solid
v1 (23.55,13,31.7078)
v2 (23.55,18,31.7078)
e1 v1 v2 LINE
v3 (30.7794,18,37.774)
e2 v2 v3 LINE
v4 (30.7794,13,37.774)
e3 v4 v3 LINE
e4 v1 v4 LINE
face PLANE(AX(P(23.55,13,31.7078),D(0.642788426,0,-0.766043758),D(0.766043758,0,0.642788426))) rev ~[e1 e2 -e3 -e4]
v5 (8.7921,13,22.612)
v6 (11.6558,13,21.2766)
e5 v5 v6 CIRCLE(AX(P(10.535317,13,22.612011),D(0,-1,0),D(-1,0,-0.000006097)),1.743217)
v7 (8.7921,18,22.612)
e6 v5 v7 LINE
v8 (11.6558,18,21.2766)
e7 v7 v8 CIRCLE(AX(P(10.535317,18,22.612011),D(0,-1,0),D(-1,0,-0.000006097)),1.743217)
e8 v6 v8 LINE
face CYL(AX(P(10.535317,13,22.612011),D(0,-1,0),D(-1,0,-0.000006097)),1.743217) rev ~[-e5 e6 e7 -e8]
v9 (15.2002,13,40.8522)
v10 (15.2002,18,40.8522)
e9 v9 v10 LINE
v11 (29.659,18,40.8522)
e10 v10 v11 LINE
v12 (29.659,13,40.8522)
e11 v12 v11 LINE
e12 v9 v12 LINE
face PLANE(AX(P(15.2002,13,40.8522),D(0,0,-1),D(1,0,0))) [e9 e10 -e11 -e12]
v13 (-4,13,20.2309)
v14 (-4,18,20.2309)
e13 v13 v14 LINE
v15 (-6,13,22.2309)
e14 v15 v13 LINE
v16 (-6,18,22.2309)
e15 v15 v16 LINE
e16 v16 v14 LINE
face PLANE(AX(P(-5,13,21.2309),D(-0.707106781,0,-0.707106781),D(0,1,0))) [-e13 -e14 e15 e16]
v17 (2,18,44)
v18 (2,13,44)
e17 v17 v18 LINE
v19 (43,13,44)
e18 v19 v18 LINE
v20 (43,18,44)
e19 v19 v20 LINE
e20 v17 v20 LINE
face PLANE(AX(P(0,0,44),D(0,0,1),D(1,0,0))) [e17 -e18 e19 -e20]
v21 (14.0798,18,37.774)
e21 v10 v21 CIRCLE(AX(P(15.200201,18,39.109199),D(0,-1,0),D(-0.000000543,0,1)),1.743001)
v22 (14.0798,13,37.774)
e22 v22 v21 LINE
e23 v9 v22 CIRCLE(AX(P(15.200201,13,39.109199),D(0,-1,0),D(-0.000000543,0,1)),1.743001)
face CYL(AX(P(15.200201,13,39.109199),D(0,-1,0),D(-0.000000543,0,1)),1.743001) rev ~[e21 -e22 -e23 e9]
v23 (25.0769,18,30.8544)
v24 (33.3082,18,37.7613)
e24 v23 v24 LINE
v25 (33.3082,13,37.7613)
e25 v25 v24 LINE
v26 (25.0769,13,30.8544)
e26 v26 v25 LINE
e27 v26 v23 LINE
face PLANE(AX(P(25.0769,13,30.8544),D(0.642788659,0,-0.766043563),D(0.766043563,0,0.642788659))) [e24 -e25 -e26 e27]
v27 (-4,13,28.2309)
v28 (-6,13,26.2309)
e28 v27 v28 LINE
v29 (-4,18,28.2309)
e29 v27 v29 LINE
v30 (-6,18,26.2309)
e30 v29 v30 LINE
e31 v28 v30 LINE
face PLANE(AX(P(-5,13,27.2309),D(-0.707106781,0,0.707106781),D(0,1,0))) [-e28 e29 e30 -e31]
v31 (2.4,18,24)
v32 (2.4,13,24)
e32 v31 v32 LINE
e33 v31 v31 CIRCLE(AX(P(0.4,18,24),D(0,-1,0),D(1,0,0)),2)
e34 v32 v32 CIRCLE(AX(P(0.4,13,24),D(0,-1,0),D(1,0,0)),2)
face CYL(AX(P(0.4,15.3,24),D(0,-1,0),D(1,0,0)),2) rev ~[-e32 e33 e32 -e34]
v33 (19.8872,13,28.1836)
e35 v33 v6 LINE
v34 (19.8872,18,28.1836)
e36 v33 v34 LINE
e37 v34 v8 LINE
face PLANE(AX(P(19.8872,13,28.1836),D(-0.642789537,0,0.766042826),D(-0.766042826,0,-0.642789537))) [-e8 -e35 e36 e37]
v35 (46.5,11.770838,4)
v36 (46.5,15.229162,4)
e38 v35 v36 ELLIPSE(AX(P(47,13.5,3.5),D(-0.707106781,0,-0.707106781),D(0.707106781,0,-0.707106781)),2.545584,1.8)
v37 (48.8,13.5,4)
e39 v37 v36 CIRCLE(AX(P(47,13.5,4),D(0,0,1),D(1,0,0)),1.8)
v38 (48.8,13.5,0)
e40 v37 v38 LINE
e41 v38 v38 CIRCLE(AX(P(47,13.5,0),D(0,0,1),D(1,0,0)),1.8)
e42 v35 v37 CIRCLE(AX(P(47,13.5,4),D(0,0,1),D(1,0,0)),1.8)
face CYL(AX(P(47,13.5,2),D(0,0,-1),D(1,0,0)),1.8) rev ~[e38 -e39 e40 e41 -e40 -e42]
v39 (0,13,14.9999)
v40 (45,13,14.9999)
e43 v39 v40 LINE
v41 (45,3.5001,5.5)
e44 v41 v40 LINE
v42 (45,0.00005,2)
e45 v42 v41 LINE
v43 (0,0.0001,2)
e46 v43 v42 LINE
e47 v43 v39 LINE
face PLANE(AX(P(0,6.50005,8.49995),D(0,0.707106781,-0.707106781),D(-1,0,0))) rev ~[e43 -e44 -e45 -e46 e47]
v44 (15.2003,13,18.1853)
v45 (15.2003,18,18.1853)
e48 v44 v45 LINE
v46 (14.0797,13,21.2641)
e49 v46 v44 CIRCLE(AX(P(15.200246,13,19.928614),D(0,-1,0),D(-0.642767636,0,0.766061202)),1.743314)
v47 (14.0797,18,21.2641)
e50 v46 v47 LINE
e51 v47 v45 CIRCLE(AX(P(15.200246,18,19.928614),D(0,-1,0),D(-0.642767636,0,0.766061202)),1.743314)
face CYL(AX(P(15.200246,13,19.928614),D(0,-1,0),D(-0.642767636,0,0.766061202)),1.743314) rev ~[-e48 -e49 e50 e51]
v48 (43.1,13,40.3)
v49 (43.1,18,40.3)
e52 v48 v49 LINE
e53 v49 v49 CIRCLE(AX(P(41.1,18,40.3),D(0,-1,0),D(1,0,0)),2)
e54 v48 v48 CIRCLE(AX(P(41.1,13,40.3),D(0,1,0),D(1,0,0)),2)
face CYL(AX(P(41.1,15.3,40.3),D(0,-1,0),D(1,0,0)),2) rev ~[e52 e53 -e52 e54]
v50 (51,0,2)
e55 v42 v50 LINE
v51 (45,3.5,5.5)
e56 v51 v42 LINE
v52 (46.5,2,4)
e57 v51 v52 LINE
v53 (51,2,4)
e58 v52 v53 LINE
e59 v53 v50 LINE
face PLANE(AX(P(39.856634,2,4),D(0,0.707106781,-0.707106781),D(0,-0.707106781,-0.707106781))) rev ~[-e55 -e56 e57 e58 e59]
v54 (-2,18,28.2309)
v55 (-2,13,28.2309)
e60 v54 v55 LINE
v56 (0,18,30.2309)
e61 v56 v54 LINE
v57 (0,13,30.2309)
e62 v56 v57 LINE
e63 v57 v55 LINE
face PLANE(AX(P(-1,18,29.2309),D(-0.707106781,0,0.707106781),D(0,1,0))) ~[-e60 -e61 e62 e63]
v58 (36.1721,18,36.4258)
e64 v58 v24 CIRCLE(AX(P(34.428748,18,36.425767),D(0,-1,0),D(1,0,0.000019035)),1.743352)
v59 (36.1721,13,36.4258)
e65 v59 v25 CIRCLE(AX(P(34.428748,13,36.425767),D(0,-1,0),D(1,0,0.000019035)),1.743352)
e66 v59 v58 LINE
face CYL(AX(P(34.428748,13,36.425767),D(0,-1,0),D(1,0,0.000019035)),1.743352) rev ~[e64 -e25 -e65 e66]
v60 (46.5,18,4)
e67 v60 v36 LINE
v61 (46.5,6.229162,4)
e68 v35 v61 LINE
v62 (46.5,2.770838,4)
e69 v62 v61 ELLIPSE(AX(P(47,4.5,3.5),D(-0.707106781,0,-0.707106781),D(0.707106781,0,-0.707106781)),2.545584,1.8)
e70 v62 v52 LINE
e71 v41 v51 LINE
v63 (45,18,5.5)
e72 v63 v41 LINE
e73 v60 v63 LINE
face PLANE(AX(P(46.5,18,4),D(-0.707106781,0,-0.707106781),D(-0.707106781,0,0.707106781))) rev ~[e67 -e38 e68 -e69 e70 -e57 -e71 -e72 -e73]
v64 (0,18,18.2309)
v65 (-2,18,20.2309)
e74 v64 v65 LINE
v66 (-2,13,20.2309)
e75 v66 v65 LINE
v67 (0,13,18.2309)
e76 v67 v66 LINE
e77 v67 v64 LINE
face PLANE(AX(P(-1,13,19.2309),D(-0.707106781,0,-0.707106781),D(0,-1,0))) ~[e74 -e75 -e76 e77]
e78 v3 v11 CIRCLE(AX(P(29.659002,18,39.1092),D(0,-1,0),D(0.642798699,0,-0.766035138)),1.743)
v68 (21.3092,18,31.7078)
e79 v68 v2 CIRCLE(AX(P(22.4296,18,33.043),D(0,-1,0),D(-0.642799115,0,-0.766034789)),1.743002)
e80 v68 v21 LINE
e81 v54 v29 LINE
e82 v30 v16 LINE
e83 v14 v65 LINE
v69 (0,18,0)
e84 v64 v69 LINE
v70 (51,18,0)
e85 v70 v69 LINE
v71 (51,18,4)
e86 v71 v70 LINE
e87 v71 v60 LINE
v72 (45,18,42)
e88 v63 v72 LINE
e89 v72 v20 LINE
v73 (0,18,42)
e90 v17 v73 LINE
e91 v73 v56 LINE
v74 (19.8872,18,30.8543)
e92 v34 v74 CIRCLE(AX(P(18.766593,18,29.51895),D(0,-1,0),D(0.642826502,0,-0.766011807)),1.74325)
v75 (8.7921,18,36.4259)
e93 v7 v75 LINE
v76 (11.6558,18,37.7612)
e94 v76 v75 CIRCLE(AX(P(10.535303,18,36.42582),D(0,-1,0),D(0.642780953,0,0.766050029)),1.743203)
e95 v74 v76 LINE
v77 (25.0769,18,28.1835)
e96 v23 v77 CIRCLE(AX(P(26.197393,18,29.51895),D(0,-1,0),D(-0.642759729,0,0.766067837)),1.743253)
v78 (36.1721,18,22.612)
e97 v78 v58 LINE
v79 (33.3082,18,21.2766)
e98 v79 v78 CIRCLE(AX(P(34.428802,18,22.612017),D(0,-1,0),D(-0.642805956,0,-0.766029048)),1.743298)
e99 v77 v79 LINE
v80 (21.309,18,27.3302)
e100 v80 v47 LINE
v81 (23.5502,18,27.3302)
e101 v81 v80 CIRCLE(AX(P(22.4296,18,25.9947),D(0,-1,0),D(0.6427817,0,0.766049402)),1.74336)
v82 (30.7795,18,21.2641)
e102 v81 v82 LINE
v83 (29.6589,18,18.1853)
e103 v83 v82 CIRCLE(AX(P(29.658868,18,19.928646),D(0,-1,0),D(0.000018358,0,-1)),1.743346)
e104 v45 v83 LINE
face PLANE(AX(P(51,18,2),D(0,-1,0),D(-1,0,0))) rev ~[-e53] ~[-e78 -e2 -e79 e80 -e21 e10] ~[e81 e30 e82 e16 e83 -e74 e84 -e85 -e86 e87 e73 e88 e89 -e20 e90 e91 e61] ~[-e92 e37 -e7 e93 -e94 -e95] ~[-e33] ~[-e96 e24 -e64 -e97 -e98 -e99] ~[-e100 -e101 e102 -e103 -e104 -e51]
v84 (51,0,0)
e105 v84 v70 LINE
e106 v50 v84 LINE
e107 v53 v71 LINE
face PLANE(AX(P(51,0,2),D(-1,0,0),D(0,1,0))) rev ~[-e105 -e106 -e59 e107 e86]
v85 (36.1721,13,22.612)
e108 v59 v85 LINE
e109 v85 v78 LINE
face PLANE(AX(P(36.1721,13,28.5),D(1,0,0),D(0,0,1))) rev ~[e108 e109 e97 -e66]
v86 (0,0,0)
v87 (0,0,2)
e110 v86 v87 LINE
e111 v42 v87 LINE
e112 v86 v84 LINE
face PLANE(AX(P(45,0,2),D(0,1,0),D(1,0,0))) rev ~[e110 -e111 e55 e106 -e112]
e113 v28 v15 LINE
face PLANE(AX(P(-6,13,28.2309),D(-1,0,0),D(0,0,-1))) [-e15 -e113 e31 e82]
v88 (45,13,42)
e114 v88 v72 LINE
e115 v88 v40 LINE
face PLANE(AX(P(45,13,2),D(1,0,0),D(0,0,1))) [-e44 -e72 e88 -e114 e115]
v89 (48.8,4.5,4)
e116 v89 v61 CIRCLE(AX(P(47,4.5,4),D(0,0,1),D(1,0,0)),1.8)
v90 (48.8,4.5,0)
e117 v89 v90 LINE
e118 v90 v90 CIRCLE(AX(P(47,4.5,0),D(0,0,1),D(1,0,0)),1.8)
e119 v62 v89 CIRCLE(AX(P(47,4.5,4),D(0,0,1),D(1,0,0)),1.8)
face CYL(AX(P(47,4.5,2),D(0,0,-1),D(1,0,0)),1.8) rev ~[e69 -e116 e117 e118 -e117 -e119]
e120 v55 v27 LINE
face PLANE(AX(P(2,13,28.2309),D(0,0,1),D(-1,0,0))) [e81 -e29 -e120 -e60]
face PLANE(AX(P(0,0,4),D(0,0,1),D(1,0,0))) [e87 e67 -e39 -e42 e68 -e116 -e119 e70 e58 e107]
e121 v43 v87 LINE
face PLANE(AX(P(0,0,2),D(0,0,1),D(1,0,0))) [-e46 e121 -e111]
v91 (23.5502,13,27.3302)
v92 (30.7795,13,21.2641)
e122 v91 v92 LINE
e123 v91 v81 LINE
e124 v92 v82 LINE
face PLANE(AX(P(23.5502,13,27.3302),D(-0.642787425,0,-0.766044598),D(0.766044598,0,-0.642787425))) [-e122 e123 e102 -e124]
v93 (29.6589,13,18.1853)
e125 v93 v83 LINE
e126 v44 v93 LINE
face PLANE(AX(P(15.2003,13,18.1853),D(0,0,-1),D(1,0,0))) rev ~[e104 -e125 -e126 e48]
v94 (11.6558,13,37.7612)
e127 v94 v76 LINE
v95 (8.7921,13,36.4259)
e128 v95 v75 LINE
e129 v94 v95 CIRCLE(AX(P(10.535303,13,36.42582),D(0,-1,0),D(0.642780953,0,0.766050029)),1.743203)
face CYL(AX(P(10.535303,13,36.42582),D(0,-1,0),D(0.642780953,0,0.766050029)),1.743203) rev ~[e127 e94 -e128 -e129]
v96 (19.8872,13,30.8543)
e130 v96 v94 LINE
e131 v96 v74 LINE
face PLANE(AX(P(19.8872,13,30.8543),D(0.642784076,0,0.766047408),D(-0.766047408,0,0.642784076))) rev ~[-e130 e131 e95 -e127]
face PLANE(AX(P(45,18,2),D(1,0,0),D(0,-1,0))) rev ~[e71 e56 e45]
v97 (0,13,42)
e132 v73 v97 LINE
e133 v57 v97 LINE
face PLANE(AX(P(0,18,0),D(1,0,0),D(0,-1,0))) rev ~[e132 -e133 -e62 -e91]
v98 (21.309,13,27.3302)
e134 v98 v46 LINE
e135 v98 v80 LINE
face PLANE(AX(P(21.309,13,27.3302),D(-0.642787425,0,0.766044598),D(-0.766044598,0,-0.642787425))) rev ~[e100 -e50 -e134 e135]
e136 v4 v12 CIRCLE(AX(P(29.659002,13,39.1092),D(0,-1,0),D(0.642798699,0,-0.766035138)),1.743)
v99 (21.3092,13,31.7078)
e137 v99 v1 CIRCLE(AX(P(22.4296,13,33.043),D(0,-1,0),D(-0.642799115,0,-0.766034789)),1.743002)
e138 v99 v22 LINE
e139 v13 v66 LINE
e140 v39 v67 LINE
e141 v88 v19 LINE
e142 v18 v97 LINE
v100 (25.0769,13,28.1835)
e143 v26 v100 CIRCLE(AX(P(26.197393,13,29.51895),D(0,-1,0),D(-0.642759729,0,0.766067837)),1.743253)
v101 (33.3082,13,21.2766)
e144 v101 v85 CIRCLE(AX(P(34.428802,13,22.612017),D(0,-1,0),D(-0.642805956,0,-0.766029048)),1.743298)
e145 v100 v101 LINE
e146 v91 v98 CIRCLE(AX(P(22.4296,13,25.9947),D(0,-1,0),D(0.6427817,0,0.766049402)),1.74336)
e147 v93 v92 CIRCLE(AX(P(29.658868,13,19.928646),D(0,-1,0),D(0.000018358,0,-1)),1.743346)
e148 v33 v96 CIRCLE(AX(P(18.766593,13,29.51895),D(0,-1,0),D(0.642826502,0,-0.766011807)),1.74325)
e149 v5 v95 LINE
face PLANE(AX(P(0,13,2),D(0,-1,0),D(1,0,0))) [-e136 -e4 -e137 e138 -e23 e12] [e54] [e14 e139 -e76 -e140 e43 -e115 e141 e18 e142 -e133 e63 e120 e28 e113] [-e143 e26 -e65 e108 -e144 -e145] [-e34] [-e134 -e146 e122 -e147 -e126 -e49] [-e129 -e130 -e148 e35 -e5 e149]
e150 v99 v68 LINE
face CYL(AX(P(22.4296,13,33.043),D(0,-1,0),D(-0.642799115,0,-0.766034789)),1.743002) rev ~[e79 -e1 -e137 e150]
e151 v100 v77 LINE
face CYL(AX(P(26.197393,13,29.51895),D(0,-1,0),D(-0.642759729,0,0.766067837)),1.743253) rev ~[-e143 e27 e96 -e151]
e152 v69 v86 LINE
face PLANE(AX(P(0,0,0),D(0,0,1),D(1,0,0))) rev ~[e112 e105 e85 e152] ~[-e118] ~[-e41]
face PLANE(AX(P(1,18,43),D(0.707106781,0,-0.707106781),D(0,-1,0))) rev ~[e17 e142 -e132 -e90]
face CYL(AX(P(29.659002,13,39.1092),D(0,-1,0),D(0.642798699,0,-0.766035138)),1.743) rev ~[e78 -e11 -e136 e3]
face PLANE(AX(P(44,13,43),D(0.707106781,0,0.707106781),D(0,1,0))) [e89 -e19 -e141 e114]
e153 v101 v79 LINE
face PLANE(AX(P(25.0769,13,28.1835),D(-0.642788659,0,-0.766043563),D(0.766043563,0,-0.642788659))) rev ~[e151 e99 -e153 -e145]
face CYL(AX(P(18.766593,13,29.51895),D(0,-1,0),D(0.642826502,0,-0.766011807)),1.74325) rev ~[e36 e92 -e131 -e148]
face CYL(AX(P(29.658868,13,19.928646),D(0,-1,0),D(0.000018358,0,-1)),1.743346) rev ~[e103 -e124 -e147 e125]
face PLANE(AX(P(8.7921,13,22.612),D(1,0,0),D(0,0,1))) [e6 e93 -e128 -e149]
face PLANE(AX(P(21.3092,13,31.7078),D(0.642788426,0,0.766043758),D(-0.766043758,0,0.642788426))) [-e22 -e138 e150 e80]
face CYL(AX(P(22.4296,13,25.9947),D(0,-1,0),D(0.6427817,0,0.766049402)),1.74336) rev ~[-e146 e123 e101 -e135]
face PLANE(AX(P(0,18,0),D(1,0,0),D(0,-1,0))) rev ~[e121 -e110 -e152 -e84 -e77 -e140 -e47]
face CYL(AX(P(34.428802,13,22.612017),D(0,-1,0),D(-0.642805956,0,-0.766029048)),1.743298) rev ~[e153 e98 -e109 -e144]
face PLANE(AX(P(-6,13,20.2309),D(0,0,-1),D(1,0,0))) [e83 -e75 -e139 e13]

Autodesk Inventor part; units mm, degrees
sketch "スケッチ1" plane through (0, 0, 0) normal (0, 0, 1) x (1, 0, 0)
  line L0 (0, 0) -> (51, 0)
  line L1 (51, 0) -> (51, 18)
  line L2 (51, 18) -> (0, 18)
  line L3 (0, 18) -> (0, 0)
  circle A0 centre (47, 13.5) radius 1.8
  circle A1 centre (47, 4.5) radius 1.8
  dimension "d0" = 51
  dimension "d1" = 18
  dimension "d4" = 3.6
  dimension "d5" = 13.5
  dimension "d6" = 4
  dimension "d7" = 3.6
  dimension "d8" = 4
  dimension "d9" = 4.5
extrude "押し出し2" add sketch "スケッチ1" along normal blind 2
sketch "スケッチ2" plane through (0, 0, 2) normal (0, 0, 1) x (1, 0, 0)
  line L0 (0, 18) -> (0, 0) projected
  line L1 (0, 18) -> (44, 18)
  line L2 (44, 18) -> (44, 13)
  line L3 (44, 13) -> (0, 13)
  line L4 (0, 13) -> (0, 18)
  dimension "d12" = 44
  dimension "d13" = 5
extrude "押し出し3" add sketch "スケッチ2" along normal blind 42
sketch "スケッチ3" plane through (0, 13, 2) normal (0, -1, 0) x (1, 0, 0)
  circle A0 centre (41.1, 3.5) radius 2
  line L0 (44, 0) -> (44, 42) projected
  line L1 (44, 0) -> (0, 0) projected
  circle A1 centre (0.4, 19.8) radius 2
  point P0 (0, -2)
  dimension "d16" = 4
  dimension "d17" = 2.9
  dimension "d18" = 3.5
  dimension "d27" = 4
  dimension "d28" = 40.7
  dimension "d29" = 16.3
sketch "スケッチ4" plane through (0, 13, 2) normal (0, -1, 0) x (1, 0, 0)
  line L0 (8, 13.3) -> (-4, 13.3)
  line L1 (-4, 13.3) -> (-4, 24.3)
  line L2 (-4, 24.3) -> (8, 24.3)
  line L3 (8, 24.3) -> (8, 13.3)
  line L4 (44, 0) -> (0, 0) projected
  line L5 (44, 0) -> (44, 42) projected
  line L6 (0, 42) -> (44, 42) projected
  line L7 (0, 0) -> (0, 42) projected
  point P0 (0, -2)
  dimension "d19" = 13.3
  dimension "d20" = 36
  dimension "d25" = 11
  dimension "d26" = 12
ref_plane "作業平面2" through (-4, 15.3, 26.3) normal (0, -1, 0) x (1, 0, 0)
sketch "スケッチ5" plane through (-4, 15.3, 26.3) normal (0, -1, 0) x (1, 0, 0)
  point P0 (4, -26.3)
ref_plane "作業平面1" through (-4, 15.3, 26.3) normal (0, -1, 0) x (1, 0, 0)
sketch "スケッチ6" plane through (-4, 15.3, 26.3) normal (0, -1, 0) x (1, 0, 0)
  line L0 (4, -24.3) -> (4, 17.7) projected
  circle A0 centre (4.4, -2.3) radius 2
  circle A1 centre (45.1, 14) radius 2
  line L1 (4, -24.3) -> (55, -24.3) projected
  line L2 (48, -24.3) -> (48, 17.7) projected
  line L3 (4, 17.7) -> (48, 17.7) projected
  point P0 (4, -26.3)
  dimension "d45" = 4
  dimension "d46" = 0.4
  dimension "d47" = 4
  dimension "d48" = 22
  dimension "d49" = 2.9
  dimension "d67" = 43.8427
sketch "スケッチ7" plane through (0, 13, 2) normal (0, -1, 0) x (1, 0, 0)
  point P0 (0, -2)
sketch "スケッチ8" plane through (0, 13, 2) normal (0, -1, 0) x (1, 0, 0)
  line L0 (44, 0) -> (44, 42) projected
  line L1 (44, 0) -> (45, 0)
  line L2 (45, 0) -> (45, 21.3)
  line L3 (45, 21.3) -> (44, 21.3)
  line L4 (44, 21.3) -> (44, 0)
  point P0 (0, -2)
  dimension "d35" = 1
extrude "押し出し6" add sketch "スケッチ8" against normal blind 5
ref_plane "作業平面3" through (45, 13, 3) normal (0, -1, 0) x (1, 0, 0)
sketch "スケッチ9" plane through (45, 13, 3) normal (0, -1, 0) x (1, 0, 0)
  line L0 (-51, 17.2309) -> (-43, 17.2309)
  line L1 (-43, 17.2309) -> (-43, 25.2309)
  line L2 (-43, 25.2309) -> (-51, 25.2309)
  line L3 (-51, 25.2309) -> (-51, 17.2309)
  line L4 (0, 41) -> (-10, 41)
  line L5 (-10, 41) -> (-10, 7.258)
  line L6 (-10, 7.258) -> (0, 7.258)
  line L7 (0, 7.258) -> (0, 41)
  line L8 (0, 16.7) -> (0, 41)
  line L9 (-45, -1) -> (6, -1) projected
  point P0 (-45, -3)
  point P1 (-45, 4.4596)
  point P2 (-2.5771, 20.3)
  dimension "d55" = 8
  dimension "d59" = 0
  dimension "d97" = 18.2309
  dimension "d98" = 8.258
  dimension "d99" = 33.742
extrude "押し出し8" add sketch "スケッチ9" against normal blind 5
extrude "押し出し9" cut sketch "スケッチ6" along normal mid plane 10 contours A0 L0 | L0 A0 | A1
chamfer "面取り5" distance 13 angle 45 1 edges at (22.5, 13, 2)
sketch "スケッチ10" plane through (0, 0, 2) normal (0, 0, 1) x (1, 0, 0)
  line L0 (45, 18) -> (45, 0) projected
  line L1 (45, 0) -> (51, 0) projected
  line L2 (51, 0) -> (51, 18) projected
  line L3 (51, 18) -> (45, 18) projected
  circle A0 centre (47, 13.5) radius 1.8 projected
  circle A1 centre (47, 4.5) radius 1.8 projected
  circle A2 centre (47, 4.5) radius 1.8
  circle A3 centre (47, 13.5) radius 1.8
  line L4 (45, 0) -> (51, 0)
  line L5 (51, 0) -> (51, 18)
  line L6 (51, 18) -> (45, 18)
  line L7 (45, 18) -> (45, 0)
  point P0 (0, 0)
extrude "押し出し10" add sketch "スケッチ10" along normal blind 2
chamfer "面取り6" distance 2 angle 45 1 edges at (48, 0, 4)
chamfer "面取り7" distance 1.5 angle 45 1 edges at (45, 10.0001, 4)
chamfer "面取り8" distance 2 angle 45 4 edges at (45, 15.5, 44) (0, 15.5, 44) (-6, 15.5, 20.2309) (-6, 15.5, 28.2309)
sketch "スケッチ11" plane through (0, 13, 15) normal (0, -1, 0) x (1, 0, 0)
  line L0 (45, 0) -> (45, 27) projected
  line L1 (45, 13.5) -> (35.6998, 13.5)
  line L2 (19.8872, 15.8543) -> (11.6558, 22.7612)
  line L3 (21.4786, 14.5189) -> (32.2238, 14.5189) construction
  line L4 (19.8872, 13.1836) -> (11.6558, 6.2766)
  line L5 (21.4786, 14.5189) -> (32.2239, 14.5189) construction
  line L6 (8.7921, 7.612) -> (8.7921, 21.4259)
  arc A0 (11.6558, 22.7612) -> (8.7921, 21.4259) centre (10.5353, 21.4258) ccw
  arc A1 (19.8872, 13.1836) -> (19.8872, 15.8543) centre (18.7667, 14.5189) ccw
  arc A2 (8.7921, 7.612) -> (11.6558, 6.2766) centre (10.5353, 7.612) ccw
  line L7 (25.0769, 15.8544) -> (33.3082, 22.7613)
  line L8 (25.0769, 13.1835) -> (33.3082, 6.2766)
  line L9 (36.1721, 7.612) -> (36.1721, 21.4258)
  arc A3 (36.1721, 21.4258) -> (33.3082, 22.7613) centre (34.4288, 21.4258) ccw
  arc A4 (25.0769, 15.8544) -> (25.0769, 13.1835) centre (26.1975, 14.5189) ccw
  arc A5 (33.3082, 6.2766) -> (36.1721, 7.612) centre (34.4288, 7.612) ccw
  line L10 (23.55, 16.7078) -> (30.7794, 22.774)
  line L11 (23.8988, 16.5352) -> (33.3361, 16.5352) construction
  line L12 (21.3092, 16.7078) -> (14.0798, 22.774)
  line L13 (23.8988, 16.5352) -> (33.3361, 16.5352) construction
  line L14 (15.2002, 25.8522) -> (29.659, 25.8522)
  arc A6 (21.3092, 16.7078) -> (23.55, 16.7078) centre (22.4296, 18.043) ccw
  arc A7 (15.2002, 25.8522) -> (14.0798, 22.774) centre (15.2002, 24.1092) ccw
  arc A8 (30.7794, 22.774) -> (29.659, 25.8522) centre (29.659, 24.1092) ccw
  line L15 (23.5502, 12.3302) -> (30.7795, 6.2641)
  line L16 (21.309, 12.3302) -> (14.0797, 6.2641)
  line L17 (15.2003, 3.1853) -> (29.6589, 3.1853)
  arc A9 (23.5502, 12.3302) -> (21.309, 12.3302) centre (22.4296, 10.9947) ccw
  arc A10 (14.0797, 6.2641) -> (15.2003, 3.1853) centre (15.2003, 4.9286) ccw
  arc A11 (29.6589, 3.1853) -> (30.7795, 6.2641) centre (29.6589, 4.9286) ccw
  point P0 (0, -15)
  point P1 (8.7921, 25.1641)
  point P2 (8.792, 3.8737)
  point P3 (23.4854, 14.5189)
  point P4 (36.1721, 25.1643)
  point P5 (36.1721, 3.8735)
  point P6 (35.918, 26.6205)
  point P7 (11.8795, 26.6205)
  point P8 (21.9006, 14.5189)
  dimension "d82" = 16.561
  dimension "d83" = 140
  dimension "d84" = 16.5611
  dimension "d85" = 140
  dimension "d86" = 1.7432
  dimension "d87" = 15.69
  dimension "d88" = 40
  dimension "d89" = 15.69
  dimension "d90" = 140
  dimension "d91" = 1.743
extrude "押し出し11" cut sketch "スケッチ11" against normal blind 5
chamfer "面取り9" distance 2 angle 45 2 edges at (0, 15.5, 28.2309) (0, 15.5, 20.2309)
properties part number "PingCover-y" material "ABS プラスチック"
